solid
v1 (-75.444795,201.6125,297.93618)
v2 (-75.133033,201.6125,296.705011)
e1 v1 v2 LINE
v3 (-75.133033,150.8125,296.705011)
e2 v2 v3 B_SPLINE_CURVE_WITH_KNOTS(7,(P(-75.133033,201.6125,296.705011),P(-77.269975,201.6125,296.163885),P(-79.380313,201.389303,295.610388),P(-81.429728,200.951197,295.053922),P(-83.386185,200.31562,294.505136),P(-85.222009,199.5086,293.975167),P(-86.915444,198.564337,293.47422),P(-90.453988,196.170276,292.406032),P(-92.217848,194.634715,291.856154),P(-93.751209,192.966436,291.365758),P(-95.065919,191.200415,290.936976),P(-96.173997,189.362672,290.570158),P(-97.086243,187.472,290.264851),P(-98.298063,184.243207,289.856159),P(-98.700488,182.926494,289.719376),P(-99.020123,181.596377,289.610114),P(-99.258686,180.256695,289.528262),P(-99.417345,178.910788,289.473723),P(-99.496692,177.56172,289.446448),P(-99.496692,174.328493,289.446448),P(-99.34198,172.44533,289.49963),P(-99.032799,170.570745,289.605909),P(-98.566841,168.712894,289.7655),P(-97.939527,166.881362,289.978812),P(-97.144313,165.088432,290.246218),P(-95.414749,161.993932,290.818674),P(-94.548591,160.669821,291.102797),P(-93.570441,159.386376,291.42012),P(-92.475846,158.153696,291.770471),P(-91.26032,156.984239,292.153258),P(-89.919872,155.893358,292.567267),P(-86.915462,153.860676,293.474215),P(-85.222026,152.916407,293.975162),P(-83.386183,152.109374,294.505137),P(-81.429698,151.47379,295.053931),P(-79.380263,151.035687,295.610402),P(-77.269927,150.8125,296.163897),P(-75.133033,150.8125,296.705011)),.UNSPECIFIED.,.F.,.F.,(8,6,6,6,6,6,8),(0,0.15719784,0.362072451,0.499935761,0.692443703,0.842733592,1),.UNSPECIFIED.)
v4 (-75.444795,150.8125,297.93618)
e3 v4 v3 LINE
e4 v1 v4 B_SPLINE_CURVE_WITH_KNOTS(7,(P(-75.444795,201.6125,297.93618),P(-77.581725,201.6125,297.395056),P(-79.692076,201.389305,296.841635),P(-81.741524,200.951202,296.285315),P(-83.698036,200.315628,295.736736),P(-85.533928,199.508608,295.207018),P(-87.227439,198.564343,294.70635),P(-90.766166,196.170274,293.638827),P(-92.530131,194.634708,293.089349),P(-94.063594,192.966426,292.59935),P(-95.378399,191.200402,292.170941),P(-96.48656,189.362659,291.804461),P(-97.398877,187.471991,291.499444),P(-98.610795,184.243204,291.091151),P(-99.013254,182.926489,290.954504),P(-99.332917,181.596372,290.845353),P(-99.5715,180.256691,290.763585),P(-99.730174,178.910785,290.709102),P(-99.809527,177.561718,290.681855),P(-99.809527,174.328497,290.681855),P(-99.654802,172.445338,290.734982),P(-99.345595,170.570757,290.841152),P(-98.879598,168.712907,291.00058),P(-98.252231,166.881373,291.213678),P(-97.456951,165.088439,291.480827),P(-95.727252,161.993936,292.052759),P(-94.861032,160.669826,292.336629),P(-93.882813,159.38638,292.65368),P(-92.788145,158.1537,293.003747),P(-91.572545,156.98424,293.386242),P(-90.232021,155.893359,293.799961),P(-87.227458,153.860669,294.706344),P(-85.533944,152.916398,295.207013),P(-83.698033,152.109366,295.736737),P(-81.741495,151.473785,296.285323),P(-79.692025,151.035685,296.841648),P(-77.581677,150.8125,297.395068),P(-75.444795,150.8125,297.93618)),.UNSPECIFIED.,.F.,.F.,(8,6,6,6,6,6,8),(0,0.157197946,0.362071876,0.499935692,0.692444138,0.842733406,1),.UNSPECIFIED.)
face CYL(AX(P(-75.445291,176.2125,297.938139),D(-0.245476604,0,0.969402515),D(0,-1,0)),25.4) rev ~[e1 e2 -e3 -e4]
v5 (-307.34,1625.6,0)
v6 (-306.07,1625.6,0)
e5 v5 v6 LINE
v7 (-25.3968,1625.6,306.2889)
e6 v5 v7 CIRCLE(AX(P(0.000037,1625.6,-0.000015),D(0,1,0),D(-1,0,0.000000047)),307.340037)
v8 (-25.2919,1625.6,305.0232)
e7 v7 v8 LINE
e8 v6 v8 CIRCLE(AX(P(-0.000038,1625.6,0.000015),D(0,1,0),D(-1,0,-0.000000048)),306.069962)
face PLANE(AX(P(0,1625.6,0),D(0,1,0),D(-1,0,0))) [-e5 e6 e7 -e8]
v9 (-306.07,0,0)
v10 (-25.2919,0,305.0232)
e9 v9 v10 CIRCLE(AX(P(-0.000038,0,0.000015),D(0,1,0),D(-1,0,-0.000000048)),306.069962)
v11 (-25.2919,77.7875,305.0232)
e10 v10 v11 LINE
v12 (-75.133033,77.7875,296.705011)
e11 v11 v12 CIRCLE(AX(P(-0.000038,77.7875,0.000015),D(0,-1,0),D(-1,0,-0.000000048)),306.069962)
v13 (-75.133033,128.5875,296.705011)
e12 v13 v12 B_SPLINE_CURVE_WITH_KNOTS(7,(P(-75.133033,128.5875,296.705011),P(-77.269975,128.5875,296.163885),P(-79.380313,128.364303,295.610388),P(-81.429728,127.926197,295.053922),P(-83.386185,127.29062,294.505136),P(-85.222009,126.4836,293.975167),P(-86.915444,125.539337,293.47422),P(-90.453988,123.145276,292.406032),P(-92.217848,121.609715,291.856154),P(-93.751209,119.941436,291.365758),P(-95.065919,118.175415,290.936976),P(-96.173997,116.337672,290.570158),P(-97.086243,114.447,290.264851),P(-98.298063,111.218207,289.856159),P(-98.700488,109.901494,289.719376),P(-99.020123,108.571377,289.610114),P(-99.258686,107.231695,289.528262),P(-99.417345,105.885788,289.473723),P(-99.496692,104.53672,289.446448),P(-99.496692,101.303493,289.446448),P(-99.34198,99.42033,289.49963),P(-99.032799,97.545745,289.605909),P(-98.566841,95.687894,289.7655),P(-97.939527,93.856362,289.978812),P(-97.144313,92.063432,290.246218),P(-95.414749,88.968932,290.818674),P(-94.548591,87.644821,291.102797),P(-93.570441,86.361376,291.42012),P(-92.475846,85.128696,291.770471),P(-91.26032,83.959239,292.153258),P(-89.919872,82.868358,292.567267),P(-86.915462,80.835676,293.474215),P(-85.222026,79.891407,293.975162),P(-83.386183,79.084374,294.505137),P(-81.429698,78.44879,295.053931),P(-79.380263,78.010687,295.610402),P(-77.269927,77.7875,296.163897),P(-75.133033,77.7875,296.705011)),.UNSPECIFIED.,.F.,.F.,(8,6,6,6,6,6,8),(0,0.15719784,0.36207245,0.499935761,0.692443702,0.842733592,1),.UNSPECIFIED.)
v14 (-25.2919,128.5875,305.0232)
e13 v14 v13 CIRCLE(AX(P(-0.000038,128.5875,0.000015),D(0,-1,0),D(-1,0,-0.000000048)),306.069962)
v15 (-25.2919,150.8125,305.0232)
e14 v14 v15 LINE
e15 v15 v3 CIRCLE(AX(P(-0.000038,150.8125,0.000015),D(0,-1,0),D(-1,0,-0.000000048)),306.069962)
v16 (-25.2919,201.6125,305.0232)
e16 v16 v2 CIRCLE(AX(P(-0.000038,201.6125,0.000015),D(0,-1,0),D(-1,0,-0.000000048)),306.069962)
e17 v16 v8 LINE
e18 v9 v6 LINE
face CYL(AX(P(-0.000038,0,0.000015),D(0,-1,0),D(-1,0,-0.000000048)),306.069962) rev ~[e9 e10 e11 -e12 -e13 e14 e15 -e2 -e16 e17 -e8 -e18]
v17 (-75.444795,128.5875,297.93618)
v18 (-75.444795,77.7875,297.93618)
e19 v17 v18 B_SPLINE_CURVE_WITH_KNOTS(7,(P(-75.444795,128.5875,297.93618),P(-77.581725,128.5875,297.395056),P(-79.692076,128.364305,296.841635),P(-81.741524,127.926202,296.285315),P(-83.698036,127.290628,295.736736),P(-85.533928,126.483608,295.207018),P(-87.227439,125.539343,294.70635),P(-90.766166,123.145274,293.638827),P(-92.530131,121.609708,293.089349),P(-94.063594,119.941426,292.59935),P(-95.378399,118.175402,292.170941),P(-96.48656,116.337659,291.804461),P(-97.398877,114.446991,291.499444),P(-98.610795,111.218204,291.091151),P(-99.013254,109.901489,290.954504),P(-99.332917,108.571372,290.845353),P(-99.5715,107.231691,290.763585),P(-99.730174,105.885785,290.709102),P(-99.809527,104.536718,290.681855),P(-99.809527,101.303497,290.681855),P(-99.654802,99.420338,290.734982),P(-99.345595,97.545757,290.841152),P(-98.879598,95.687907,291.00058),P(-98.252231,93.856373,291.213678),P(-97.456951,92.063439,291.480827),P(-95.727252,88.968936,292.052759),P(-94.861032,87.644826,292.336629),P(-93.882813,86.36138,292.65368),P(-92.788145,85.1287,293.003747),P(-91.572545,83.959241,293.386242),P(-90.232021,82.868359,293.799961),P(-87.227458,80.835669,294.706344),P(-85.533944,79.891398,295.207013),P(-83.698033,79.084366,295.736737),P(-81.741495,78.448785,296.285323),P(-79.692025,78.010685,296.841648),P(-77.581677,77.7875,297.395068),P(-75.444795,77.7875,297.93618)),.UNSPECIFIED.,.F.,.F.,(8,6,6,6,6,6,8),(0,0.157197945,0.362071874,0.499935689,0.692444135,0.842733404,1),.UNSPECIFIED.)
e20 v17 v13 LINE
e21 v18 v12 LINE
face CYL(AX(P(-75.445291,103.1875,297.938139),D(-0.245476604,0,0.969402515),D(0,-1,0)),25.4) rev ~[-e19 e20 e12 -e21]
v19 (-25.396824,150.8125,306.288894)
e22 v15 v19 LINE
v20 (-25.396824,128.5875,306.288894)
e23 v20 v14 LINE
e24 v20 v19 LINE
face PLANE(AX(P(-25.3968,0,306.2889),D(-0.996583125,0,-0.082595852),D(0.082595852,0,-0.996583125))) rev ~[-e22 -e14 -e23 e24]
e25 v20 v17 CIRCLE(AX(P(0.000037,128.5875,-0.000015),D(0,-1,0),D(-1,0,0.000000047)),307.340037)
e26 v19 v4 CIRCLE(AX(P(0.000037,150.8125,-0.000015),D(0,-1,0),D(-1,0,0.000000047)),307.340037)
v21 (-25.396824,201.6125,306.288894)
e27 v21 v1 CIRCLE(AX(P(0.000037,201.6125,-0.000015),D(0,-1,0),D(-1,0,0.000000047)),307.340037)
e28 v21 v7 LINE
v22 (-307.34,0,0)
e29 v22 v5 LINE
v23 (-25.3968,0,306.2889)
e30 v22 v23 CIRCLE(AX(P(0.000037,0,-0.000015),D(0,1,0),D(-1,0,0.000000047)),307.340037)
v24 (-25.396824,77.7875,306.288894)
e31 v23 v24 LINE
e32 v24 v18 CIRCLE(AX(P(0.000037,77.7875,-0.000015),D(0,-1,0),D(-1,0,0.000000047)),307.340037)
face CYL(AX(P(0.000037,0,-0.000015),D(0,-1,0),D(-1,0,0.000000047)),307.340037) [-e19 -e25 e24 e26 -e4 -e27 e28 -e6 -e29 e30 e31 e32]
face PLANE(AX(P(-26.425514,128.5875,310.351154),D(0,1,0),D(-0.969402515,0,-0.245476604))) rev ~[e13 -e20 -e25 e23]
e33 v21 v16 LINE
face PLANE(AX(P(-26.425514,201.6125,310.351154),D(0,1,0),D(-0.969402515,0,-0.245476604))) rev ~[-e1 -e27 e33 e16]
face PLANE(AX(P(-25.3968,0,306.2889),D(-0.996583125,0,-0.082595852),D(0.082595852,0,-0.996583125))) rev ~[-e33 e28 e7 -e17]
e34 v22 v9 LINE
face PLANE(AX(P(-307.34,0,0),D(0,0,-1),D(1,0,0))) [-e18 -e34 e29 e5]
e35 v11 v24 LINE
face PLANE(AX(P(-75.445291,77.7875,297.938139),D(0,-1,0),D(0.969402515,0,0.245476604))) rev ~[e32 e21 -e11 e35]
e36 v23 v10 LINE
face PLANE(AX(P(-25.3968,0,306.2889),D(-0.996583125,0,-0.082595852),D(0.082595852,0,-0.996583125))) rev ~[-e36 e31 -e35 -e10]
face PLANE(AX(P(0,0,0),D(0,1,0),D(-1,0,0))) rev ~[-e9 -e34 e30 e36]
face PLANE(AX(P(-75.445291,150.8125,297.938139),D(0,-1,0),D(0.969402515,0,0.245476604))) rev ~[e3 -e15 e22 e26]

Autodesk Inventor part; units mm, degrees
ref_plane "YZ Plane" through (0, 0, 0) normal (1, 0, 0) x (0, 1, 0)
ref_plane "XZ Plane" through (0, 0, 0) normal (0, 1, 0) x (-1, 0, 0)
sketch "Sketch1" plane through (0, 0, 0) normal (0, 1, 0) x (-1, 0, 0)
  arc A0 (307.34, 0) -> (25.3968, 306.2889) centre (0, 0) ccw
  line L0 (0, 0) -> (25.3968, 306.2889) construction
  line L1 (0, 0) -> (307.34, 0) construction
  arc A1 (306.07, 0) -> (25.2919, 305.0232) centre (0, 0) ccw
  line L2 (0, 0) -> (25.2919, 305.0232) construction
  line L3 (0, 0) -> (306.07, 0) construction
  line L4 (25.3968, 306.2889) -> (25.2919, 305.0232)
  line L5 (307.34, 0) -> (306.07, 0)
  dimension "d0" = 307.34
  dimension "d1" = 85.26
  dimension "d2" = 306.07
  dimension "d3" = 85.26
extrude "Extrusion1" add sketch "Sketch1" along normal blind 1625.6
sketch "Sketch2" plane through (0, 0, 0) normal (0, 1, 0) x (-1, 0, 0)
  arc A0 (75.4448, 297.9362) -> (25.3968, 306.2889) centre (0, 0) ccw
  line L0 (0, 0) -> (75.4448, 297.9362) construction
  line L1 (0, 0) -> (25.3968, 306.2889) construction
  arc A1 (123.4855, 281.4413) -> (25.3968, 306.2889) centre (0, 0) ccw
  line L2 (0, 0) -> (123.4855, 281.4413) construction
  line L3 (0, 0) -> (25.3968, 306.2889) construction
  arc A2 (307.34, 0) -> (290.6829, 99.8065) centre (0, 0) ccw
  line L4 (0, 0) -> (290.6829, 99.8065) construction
  line L5 (0, 0) -> (307.34, 0) construction
  dimension "d6" = 9.47
  dimension "d13" = 18.95
  dimension "d14" = 18.95
ref_plane "Work Plane1" through (-75.4448, 0, 297.9362) normal (-0.2454766, 0, 0.9694025) x (0, -1, 0)
sketch "Sketch3" plane through (-75.4448, 0, 297.9362) normal (-0.2454766, 0, 0.9694025) x (0, -1, 0)
  circle A0 centre (-103.1875, 0) radius 25.4
  line L0 (0, 50.567) -> (0, -297.9362) projected
  line L1 (0, 50.567) -> (-1625.6, 50.567) projected
  line L2 (-128.5875, 0) -> (-77.7875, 0)
  line L3 (-77.7875, 0) -> (-77.7875, 50.567)
  line L4 (-77.7875, 50.567) -> (-128.5875, 50.567)
  line L5 (-128.5875, 50.567) -> (-128.5875, 0)
  circle A1 centre (-176.2125, 0) radius 25.4
  line L6 (-201.6125, 0) -> (-150.8125, 0)
  line L7 (-150.8125, 0) -> (-150.8125, 50.567)
  line L8 (-150.8125, 50.567) -> (-201.6125, 50.567)
  line L9 (-201.6125, 50.567) -> (-201.6125, 0)
  point P0 (0, 0)
  dimension "d7" = 50.8
  dimension "d9" = 50.8
  dimension "d8" = 103.1875
  dimension "d10" = 176.2125
extrude "Extrusion2" cut sketch "Sketch3" against normal blind 25.4
properties part number "EDM Middle Shield Part 3"
